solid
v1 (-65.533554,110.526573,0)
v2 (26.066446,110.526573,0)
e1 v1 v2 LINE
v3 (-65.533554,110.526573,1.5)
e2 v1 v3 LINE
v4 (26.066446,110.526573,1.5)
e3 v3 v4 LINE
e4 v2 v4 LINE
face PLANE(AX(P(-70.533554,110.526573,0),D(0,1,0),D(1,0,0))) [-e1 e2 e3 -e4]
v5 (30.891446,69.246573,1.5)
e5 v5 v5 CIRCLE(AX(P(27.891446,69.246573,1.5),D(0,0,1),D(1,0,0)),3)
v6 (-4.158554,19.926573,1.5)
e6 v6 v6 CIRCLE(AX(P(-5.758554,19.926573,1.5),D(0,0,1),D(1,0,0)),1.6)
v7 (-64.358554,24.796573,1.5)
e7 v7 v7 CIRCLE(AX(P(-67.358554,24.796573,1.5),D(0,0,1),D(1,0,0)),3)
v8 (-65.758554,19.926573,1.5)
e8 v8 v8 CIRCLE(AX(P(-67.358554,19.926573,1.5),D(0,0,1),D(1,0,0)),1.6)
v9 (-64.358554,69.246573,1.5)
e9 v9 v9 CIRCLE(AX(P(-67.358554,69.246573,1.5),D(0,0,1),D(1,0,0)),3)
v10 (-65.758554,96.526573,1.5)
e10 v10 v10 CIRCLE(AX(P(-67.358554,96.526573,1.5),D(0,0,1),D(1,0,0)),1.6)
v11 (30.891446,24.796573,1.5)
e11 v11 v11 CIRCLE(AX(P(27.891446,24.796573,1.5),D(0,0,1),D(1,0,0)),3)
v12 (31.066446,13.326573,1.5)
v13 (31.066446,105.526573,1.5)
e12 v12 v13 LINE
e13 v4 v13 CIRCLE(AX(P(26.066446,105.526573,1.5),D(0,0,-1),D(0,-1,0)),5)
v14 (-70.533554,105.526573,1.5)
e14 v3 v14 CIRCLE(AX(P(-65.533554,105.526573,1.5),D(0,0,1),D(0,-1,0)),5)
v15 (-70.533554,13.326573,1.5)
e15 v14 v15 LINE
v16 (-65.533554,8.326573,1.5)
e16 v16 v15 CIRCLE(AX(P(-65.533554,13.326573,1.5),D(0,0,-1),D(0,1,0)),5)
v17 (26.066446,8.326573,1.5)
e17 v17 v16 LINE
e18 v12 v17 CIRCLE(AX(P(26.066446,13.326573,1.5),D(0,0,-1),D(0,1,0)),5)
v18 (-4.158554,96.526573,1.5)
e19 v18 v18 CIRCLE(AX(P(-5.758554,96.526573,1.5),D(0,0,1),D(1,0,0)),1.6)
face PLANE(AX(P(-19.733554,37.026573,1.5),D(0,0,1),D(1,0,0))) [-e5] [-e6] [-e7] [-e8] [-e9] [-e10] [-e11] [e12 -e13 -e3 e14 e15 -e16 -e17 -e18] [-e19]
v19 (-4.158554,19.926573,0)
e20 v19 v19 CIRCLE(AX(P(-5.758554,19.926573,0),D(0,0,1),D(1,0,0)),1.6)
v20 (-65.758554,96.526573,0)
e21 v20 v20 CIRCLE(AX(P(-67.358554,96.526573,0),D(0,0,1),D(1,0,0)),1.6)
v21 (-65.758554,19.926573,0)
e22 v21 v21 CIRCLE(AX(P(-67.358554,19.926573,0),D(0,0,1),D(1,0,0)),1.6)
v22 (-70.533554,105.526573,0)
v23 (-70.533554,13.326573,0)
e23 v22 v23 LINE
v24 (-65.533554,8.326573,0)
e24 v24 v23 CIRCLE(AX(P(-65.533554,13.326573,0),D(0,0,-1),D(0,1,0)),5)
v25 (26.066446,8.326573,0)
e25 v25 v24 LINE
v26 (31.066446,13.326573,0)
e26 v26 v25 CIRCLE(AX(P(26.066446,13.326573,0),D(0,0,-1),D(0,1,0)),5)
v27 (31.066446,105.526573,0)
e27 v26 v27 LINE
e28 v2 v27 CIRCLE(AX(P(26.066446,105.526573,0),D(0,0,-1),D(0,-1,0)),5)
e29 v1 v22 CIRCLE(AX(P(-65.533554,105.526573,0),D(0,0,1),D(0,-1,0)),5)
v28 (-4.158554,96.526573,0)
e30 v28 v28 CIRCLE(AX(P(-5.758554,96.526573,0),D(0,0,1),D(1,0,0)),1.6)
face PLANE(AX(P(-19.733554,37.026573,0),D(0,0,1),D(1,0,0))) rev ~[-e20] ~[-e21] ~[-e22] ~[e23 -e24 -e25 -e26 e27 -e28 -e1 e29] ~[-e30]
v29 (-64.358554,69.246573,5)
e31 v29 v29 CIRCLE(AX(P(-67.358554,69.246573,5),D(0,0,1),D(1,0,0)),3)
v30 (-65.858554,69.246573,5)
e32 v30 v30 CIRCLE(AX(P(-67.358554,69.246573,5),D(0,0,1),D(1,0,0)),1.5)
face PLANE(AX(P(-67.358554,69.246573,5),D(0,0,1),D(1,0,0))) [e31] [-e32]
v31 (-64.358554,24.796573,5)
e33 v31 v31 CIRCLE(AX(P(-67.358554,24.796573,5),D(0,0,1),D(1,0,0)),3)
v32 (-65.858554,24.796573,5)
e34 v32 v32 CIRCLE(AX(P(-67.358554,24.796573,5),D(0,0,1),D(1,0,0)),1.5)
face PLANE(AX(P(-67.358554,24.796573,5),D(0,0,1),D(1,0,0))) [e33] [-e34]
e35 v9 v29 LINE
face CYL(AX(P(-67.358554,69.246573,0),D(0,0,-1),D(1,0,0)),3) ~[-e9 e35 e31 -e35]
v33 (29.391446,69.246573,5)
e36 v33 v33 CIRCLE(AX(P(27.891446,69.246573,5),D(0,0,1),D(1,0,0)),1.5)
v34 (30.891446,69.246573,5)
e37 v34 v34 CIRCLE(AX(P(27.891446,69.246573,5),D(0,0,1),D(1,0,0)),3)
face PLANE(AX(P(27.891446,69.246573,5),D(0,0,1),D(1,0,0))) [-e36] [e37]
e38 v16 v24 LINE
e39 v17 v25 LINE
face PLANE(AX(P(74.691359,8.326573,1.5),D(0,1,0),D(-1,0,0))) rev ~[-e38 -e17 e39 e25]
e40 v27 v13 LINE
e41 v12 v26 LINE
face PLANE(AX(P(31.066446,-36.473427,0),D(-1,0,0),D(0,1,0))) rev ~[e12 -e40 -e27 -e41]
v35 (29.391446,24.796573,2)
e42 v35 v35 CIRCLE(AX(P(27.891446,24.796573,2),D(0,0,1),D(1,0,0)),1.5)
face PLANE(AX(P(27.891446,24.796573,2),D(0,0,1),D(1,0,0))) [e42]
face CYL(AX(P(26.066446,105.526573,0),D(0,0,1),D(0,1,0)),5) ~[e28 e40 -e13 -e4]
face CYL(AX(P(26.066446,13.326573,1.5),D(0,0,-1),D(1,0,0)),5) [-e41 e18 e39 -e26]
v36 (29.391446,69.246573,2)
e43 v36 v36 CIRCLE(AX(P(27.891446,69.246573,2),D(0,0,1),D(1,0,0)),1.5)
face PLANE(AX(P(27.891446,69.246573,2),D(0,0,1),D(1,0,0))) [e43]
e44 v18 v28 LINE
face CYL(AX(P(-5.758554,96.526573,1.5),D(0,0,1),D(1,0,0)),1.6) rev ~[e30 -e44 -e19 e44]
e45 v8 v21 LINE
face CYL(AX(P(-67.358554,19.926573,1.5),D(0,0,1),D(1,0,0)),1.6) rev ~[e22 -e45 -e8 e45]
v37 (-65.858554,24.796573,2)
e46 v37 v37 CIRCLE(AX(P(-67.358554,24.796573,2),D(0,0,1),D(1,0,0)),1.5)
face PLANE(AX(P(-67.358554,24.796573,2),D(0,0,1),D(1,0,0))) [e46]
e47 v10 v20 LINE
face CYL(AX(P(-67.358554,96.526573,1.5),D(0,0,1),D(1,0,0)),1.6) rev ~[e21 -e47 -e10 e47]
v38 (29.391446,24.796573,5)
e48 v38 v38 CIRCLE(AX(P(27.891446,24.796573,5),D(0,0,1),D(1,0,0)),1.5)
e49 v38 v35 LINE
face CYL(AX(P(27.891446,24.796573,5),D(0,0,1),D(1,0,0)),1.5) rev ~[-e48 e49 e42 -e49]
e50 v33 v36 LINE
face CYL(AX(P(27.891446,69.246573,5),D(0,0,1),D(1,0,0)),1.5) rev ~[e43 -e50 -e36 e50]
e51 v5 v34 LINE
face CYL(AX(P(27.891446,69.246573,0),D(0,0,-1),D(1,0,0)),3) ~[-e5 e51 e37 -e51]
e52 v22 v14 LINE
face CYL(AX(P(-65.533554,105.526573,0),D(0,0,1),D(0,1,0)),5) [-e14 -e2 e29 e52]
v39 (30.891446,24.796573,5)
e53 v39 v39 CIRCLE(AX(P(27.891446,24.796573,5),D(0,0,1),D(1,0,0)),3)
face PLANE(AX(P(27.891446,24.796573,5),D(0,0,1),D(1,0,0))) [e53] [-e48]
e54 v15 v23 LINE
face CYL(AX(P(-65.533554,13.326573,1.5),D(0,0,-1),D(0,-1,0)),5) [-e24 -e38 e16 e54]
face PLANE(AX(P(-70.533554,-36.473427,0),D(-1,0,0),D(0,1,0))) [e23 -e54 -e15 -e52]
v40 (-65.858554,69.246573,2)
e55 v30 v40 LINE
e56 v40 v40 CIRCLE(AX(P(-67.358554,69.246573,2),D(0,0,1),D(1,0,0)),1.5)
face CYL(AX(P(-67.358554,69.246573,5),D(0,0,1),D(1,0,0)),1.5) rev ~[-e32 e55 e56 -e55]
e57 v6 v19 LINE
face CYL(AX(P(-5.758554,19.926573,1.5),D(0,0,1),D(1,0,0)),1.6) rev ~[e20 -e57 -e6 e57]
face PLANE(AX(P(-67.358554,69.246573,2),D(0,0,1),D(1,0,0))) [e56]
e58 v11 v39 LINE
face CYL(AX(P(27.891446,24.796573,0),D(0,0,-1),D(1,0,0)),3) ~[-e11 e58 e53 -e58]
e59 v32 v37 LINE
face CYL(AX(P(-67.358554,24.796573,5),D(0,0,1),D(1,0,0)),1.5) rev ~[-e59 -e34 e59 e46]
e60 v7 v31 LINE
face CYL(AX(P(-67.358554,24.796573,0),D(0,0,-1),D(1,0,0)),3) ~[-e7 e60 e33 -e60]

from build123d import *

# Parameters (mm, degrees)
F0_W     = 101.6
F0_H     = 147
F0_R     = 3
F1_DEPTH = 1.5
F2_R     = 1.6
F3_DEPTH = 25
F4_DEPTH = 5
F5_R     = 1.5
F6_DEPTH = 3
F7_W     = 101.6
F7_H     = 44.8
F8_DEPTH = 25
F9_R     = 5


# Not quite as in the source:
# - a feature names something its author has since deleted; it is built from what else it names


with BuildPart() as f1:
    # F0 (on Top) → F1 (new body)
    with BuildSketch(Plane.XY):
        with Locations((-19.733554095, 37.0265730321)):
            Rectangle(F0_W, F0_H)
        with Locations((-67.358554095, 24.7965730321)):
            Circle(F0_R, mode=Mode.SUBTRACT)
        with Locations((27.891445905, 24.7965730321)):
            Circle(F0_R, mode=Mode.SUBTRACT)
        with Locations((-67.358554095, 69.2465730321)):
            Circle(F0_R, mode=Mode.SUBTRACT)
        with Locations((27.891445905, 69.2465730321)):
            Circle(F0_R, mode=Mode.SUBTRACT)
    extrude(amount=F1_DEPTH)

    # F2 (on face) → F3 (cut)
    with BuildSketch(Plane.XY.offset(1.5)):
        with Locations((-67.358554095, 96.5265730321)):
            Circle(F2_R)
        with Locations((-5.758554095, 96.5265730321)):
            Circle(F2_R)
        with Locations((-67.358554095, 19.9265730321)):
            Circle(F2_R)
        with Locations((-5.758554095, 19.9265730321)):
            Circle(F2_R)
    extrude(amount=-F3_DEPTH, mode=Mode.SUBTRACT)

    # F0 (on Top) → F4 (join)
    with BuildSketch(Plane.XY):
        with Locations((-67.358554095, 69.2465730321)):
            Circle(F0_R)
        with Locations((-67.358554095, 24.7965730321)):
            Circle(F0_R)
        with Locations((27.891445905, 69.2465730321)):
            Circle(F0_R)
        with Locations((27.891445905, 24.7965730321)):
            Circle(F0_R)
    extrude(amount=F4_DEPTH)

    # F5 (on face) → F6 (cut)
    with BuildSketch(Plane.XY.offset(5)):
        with Locations((-67.358554095, 69.2465730321)):
            Circle(F5_R)
        with Locations((-67.358554095, 24.7965730321)):
            Circle(F5_R)
        with Locations((27.891445905, 69.2465730321)):
            Circle(F5_R)
        with Locations((27.891445905, 24.7965730321)):
            Circle(F5_R)
    extrude(amount=-F6_DEPTH, mode=Mode.SUBTRACT)

    # F7 (on face) → F8 (cut)
    with BuildSketch(Plane.XY.offset(1.5)):
        with Locations((-19.733554095, -14.0734269679)):
            Rectangle(F7_W, F7_H)
        Polygon((-70.533554095, 8.3265730321), (-108.6030122084, 8.3265730321), (-108.6030122084, -69.3553299345), (74.6913593453, -69.3553299345), (74.6913593453, 8.3265730321), (31.066445905, 8.3265730321), (31.066445905, -36.4734269679), (-70.533554095, -36.4734269679), align=None)
        Polygon((-108.166599336, 100.5265730321), (-70.533554095, 100.5265730321), (-70.533554095, 110.5265730321), (31.066445905, 110.5265730321), (31.066445905, 100.5265730321), (58.5440034669, 100.5265730321), (58.5440034669, 119.7288488672), (-108.166599336, 119.7288488672), align=None)
    extrude(amount=-F8_DEPTH, mode=Mode.SUBTRACT)

    # F9
    f9_edges = [f1.edges().sort_by_distance(p)[0] for p in [
        (-70.533554, 8.326573, 0.75),
        (-70.533554, 110.526573, 0.75),
        (31.066446, 8.326573, 0.75),
        (31.066446, 110.526573, 0.75),
    ]]
    fillet(f9_edges, radius=F9_R)


solid = f1.part
